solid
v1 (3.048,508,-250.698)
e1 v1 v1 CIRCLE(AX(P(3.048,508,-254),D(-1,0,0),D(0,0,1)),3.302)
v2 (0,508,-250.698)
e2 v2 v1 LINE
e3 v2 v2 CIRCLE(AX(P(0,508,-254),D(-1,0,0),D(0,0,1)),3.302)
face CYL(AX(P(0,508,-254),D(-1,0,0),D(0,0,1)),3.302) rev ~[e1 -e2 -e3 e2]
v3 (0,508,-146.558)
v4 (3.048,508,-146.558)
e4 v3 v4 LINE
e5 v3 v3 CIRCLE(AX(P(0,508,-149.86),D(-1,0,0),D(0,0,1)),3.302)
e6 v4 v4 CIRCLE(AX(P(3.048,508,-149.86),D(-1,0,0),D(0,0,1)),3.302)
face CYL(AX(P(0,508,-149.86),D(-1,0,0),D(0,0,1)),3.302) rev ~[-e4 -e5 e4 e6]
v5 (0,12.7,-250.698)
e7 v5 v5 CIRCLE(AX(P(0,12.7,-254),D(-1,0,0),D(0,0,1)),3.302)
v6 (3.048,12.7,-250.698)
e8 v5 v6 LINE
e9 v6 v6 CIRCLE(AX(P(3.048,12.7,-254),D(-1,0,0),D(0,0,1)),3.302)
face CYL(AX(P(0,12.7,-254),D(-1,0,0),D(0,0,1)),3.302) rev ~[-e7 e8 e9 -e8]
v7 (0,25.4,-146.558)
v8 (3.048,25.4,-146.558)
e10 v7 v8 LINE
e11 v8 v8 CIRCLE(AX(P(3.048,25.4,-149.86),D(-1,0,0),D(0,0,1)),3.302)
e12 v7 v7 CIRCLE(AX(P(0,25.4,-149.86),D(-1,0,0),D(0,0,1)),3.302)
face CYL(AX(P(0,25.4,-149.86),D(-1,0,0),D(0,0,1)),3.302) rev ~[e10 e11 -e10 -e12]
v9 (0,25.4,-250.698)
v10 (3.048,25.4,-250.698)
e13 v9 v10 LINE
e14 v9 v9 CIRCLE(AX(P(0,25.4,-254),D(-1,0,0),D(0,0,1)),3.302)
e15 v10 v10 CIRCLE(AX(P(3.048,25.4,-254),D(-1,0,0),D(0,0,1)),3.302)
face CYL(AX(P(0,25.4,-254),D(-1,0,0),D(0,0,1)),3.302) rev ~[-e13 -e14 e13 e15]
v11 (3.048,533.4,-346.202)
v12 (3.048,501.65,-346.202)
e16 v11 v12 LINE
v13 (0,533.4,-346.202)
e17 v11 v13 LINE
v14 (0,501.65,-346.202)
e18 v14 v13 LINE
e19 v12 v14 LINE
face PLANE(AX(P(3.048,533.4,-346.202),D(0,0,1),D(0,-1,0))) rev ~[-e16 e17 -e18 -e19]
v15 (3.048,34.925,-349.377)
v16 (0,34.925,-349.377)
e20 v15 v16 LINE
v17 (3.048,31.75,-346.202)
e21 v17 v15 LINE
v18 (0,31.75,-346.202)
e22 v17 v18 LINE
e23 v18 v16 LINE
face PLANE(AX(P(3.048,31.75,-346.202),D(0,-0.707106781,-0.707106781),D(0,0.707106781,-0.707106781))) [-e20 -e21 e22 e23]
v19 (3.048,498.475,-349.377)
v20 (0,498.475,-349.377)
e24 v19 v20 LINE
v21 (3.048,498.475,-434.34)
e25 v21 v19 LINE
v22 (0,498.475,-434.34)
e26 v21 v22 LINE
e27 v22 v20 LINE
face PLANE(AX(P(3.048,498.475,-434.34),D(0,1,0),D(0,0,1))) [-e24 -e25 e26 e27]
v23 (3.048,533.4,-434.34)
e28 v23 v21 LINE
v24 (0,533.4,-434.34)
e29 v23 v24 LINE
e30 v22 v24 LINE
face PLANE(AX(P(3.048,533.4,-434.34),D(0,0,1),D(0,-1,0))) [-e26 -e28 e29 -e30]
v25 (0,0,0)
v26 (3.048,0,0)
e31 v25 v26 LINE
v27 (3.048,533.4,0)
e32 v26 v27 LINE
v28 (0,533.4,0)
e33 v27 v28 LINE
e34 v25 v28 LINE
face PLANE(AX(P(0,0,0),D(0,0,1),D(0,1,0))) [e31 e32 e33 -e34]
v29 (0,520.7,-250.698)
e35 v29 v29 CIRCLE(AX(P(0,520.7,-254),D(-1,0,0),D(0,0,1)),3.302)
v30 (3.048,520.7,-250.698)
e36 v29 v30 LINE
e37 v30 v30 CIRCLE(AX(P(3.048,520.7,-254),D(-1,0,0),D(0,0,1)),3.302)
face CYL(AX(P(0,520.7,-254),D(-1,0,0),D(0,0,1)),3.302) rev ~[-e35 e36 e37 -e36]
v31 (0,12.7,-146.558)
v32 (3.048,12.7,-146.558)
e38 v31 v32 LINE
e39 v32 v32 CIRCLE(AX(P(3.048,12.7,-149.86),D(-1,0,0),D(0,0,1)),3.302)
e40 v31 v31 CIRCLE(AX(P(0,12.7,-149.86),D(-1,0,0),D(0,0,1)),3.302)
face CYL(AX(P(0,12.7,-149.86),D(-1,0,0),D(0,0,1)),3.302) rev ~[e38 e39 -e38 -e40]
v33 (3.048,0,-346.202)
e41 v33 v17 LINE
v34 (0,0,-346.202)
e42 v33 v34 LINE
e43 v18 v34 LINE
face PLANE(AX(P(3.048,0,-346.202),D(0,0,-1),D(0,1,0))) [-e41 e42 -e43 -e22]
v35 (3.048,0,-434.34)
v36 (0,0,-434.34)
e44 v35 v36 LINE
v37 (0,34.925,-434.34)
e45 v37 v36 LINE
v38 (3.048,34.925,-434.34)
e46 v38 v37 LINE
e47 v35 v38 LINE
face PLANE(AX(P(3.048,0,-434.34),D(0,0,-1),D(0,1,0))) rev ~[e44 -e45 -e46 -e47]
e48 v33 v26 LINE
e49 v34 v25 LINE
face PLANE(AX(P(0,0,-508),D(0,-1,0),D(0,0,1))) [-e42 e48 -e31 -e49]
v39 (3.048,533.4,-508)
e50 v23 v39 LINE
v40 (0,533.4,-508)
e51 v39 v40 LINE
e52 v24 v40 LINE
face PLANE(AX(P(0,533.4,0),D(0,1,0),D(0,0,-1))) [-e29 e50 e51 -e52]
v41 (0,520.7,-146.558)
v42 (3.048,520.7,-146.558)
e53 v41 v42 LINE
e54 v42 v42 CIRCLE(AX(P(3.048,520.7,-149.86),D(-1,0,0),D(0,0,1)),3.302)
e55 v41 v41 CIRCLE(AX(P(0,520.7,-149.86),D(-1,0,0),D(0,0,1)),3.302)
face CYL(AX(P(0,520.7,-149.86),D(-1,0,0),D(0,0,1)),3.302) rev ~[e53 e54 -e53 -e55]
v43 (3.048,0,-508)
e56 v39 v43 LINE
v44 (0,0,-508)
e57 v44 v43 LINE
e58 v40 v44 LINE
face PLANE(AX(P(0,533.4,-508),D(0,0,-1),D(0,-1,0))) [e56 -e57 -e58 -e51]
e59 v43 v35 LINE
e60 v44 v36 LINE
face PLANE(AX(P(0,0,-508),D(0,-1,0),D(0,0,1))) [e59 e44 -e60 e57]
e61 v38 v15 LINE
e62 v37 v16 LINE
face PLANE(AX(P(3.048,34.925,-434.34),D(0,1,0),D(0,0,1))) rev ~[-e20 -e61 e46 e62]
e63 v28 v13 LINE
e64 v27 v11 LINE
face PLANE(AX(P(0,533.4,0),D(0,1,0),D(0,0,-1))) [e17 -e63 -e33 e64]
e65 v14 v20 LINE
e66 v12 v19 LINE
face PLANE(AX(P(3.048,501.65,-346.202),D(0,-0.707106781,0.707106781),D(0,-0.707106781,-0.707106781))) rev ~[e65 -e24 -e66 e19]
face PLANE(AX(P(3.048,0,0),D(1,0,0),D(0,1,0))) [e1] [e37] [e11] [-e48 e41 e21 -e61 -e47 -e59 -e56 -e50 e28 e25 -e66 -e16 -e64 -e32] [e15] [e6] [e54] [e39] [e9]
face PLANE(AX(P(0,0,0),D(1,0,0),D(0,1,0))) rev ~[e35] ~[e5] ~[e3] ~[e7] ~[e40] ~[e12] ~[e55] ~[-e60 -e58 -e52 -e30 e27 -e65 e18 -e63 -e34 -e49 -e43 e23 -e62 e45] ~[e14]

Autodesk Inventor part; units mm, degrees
ref_plane "YZ Plane" through (0, 0, 0) normal (1, 0, 0) x (0, 1, 0)
ref_plane "XZ Plane" through (0, 0, 0) normal (0, 1, 0) x (-1, 0, 0)
ref_plane "XY Plane" through (0, 0, 0) normal (0, 0, 1) x (1, 0, 0)
sketch "Sketch1" plane through (0, 0, 0) normal (1, 0, 0) x (0, 1, 0)
  line L0 (0, 0) -> (533.4, 0)
  line L1 (533.4, 0) -> (533.4, -508)
  line L2 (533.4, -508) -> (0, -508)
  line L3 (0, -508) -> (0, 0)
  dimension "d0" = 533.4
  dimension "d1" = 508
extrude "Extrusion1" add sketch "Sketch1" along normal blind 1.5875
sketch "Sketch3" plane through (0, 0, 0) normal (-1, 0, 0) x (0, 0, 1)
  line L0 (-508, 0) -> (-508, 533.4) projected
  line L1 (0, 0) -> (-508, 0) projected
  circle A0 centre (-358.14, 12.7) radius 3.302
  circle A1 centre (-358.14, 25.4) radius 3.302
  circle A2 centre (-149.86, 12.7) radius 3.302
  circle A3 centre (-149.86, 25.4) radius 3.302
  circle A4 centre (-254, 12.7) radius 3.302
  circle A5 centre (-254, 25.4) radius 3.302
  circle A6 centre (-358.14, 508) radius 3.302
  circle A7 centre (-358.14, 520.7) radius 3.302
  circle A8 centre (-149.86, 508) radius 3.302
  circle A9 centre (-149.86, 520.7) radius 3.302
  circle A10 centre (-254, 508) radius 3.302
  circle A11 centre (-254, 520.7) radius 3.302
extrude "Extrusion5" cut sketch "Sketch3" against normal up to surface (1.5875 mm away) contours A0 | A1 | A2 | A3 | A4 | A5
sheet face with bend "Face1" sketch "Sketch1" thickness 3.048 toward (1, 0, 0) bend radius 3.048
bend "Bend1"
extrude "Cut1" cut sketch "Sketch3" against normal up to surface (3.048 mm away)
sketch "Sketch4" plane through (3.048, 0, 0) normal (1, 0, 0) x (0, 0, -1)
  line L0 (508, 533.4) -> (508, 0) projected
  line L1 (508, 266.7) -> (434.34, 266.7)
  line L2 (0, 0) -> (508, 0) projected
  line L3 (434.34, 0) -> (434.34, 34.925)
  line L4 (434.34, 0) -> (469.265, 0) construction
  line L5 (434.34, 34.925) -> (349.377, 34.925)
  line L6 (434.34, 17.4625) -> (346.202, 17.4625)
  line L7 (346.202, 0) -> (346.202, 31.75)
  line L8 (346.202, 31.75) -> (349.377, 34.925)
  line L9 (434.34, 533.4) -> (434.34, 498.475)
  line L10 (434.34, 498.475) -> (349.377, 498.475)
  line L11 (434.34, 515.9375) -> (346.202, 515.9375)
  line L12 (346.202, 533.4) -> (346.202, 501.65)
  line L13 (346.202, 501.65) -> (349.377, 498.475)
  line L14 (0, 533.4) -> (508, 533.4) projected
  line L15 (508, 0) -> (0, 0) projected
  dimension "d42" = 73.66
  dimension "d43" = 34.925
  dimension "d44" = 90
  dimension "d45" = 84.963
  dimension "d46" = 88.138
  dimension "d47" = 31.75
extrude "Cut2" cut sketch "Sketch4" against normal blind 3.048
equation "\"d38\" = Thickness"
equation "\"d48\" = Thickness"
equation "\"d32\" = Thickness"
equation "\"d33\" = BendRadius"
equation "\"d34\" = BendReliefWidth"
equation "\"d36\" = MinimumRemnant"
equation "\"d35\" = BendReliefDepth"
equation "\"d37\" = TransitionRadius"
equation "\"BendRadius\" = Thickness"
equation "\"BendReliefWidth\" = Thickness"
equation "\"BendReliefDepth\" = 0.5 * Thickness"
equation "\"CornerReliefSize\" = 4 * Thickness"
equation "\"MinimumRemnant\" = 2 * Thickness"
equation "\"TransitionRadius\" = BendRadius"
equation "\"JacobiRadiusSize\" = BendRadius"
equation "\"GapSize\" = Thickness"
equation "\"Thickness\" = 3.048"
properties part number "TopV5" material "Acrylic, Clear"
